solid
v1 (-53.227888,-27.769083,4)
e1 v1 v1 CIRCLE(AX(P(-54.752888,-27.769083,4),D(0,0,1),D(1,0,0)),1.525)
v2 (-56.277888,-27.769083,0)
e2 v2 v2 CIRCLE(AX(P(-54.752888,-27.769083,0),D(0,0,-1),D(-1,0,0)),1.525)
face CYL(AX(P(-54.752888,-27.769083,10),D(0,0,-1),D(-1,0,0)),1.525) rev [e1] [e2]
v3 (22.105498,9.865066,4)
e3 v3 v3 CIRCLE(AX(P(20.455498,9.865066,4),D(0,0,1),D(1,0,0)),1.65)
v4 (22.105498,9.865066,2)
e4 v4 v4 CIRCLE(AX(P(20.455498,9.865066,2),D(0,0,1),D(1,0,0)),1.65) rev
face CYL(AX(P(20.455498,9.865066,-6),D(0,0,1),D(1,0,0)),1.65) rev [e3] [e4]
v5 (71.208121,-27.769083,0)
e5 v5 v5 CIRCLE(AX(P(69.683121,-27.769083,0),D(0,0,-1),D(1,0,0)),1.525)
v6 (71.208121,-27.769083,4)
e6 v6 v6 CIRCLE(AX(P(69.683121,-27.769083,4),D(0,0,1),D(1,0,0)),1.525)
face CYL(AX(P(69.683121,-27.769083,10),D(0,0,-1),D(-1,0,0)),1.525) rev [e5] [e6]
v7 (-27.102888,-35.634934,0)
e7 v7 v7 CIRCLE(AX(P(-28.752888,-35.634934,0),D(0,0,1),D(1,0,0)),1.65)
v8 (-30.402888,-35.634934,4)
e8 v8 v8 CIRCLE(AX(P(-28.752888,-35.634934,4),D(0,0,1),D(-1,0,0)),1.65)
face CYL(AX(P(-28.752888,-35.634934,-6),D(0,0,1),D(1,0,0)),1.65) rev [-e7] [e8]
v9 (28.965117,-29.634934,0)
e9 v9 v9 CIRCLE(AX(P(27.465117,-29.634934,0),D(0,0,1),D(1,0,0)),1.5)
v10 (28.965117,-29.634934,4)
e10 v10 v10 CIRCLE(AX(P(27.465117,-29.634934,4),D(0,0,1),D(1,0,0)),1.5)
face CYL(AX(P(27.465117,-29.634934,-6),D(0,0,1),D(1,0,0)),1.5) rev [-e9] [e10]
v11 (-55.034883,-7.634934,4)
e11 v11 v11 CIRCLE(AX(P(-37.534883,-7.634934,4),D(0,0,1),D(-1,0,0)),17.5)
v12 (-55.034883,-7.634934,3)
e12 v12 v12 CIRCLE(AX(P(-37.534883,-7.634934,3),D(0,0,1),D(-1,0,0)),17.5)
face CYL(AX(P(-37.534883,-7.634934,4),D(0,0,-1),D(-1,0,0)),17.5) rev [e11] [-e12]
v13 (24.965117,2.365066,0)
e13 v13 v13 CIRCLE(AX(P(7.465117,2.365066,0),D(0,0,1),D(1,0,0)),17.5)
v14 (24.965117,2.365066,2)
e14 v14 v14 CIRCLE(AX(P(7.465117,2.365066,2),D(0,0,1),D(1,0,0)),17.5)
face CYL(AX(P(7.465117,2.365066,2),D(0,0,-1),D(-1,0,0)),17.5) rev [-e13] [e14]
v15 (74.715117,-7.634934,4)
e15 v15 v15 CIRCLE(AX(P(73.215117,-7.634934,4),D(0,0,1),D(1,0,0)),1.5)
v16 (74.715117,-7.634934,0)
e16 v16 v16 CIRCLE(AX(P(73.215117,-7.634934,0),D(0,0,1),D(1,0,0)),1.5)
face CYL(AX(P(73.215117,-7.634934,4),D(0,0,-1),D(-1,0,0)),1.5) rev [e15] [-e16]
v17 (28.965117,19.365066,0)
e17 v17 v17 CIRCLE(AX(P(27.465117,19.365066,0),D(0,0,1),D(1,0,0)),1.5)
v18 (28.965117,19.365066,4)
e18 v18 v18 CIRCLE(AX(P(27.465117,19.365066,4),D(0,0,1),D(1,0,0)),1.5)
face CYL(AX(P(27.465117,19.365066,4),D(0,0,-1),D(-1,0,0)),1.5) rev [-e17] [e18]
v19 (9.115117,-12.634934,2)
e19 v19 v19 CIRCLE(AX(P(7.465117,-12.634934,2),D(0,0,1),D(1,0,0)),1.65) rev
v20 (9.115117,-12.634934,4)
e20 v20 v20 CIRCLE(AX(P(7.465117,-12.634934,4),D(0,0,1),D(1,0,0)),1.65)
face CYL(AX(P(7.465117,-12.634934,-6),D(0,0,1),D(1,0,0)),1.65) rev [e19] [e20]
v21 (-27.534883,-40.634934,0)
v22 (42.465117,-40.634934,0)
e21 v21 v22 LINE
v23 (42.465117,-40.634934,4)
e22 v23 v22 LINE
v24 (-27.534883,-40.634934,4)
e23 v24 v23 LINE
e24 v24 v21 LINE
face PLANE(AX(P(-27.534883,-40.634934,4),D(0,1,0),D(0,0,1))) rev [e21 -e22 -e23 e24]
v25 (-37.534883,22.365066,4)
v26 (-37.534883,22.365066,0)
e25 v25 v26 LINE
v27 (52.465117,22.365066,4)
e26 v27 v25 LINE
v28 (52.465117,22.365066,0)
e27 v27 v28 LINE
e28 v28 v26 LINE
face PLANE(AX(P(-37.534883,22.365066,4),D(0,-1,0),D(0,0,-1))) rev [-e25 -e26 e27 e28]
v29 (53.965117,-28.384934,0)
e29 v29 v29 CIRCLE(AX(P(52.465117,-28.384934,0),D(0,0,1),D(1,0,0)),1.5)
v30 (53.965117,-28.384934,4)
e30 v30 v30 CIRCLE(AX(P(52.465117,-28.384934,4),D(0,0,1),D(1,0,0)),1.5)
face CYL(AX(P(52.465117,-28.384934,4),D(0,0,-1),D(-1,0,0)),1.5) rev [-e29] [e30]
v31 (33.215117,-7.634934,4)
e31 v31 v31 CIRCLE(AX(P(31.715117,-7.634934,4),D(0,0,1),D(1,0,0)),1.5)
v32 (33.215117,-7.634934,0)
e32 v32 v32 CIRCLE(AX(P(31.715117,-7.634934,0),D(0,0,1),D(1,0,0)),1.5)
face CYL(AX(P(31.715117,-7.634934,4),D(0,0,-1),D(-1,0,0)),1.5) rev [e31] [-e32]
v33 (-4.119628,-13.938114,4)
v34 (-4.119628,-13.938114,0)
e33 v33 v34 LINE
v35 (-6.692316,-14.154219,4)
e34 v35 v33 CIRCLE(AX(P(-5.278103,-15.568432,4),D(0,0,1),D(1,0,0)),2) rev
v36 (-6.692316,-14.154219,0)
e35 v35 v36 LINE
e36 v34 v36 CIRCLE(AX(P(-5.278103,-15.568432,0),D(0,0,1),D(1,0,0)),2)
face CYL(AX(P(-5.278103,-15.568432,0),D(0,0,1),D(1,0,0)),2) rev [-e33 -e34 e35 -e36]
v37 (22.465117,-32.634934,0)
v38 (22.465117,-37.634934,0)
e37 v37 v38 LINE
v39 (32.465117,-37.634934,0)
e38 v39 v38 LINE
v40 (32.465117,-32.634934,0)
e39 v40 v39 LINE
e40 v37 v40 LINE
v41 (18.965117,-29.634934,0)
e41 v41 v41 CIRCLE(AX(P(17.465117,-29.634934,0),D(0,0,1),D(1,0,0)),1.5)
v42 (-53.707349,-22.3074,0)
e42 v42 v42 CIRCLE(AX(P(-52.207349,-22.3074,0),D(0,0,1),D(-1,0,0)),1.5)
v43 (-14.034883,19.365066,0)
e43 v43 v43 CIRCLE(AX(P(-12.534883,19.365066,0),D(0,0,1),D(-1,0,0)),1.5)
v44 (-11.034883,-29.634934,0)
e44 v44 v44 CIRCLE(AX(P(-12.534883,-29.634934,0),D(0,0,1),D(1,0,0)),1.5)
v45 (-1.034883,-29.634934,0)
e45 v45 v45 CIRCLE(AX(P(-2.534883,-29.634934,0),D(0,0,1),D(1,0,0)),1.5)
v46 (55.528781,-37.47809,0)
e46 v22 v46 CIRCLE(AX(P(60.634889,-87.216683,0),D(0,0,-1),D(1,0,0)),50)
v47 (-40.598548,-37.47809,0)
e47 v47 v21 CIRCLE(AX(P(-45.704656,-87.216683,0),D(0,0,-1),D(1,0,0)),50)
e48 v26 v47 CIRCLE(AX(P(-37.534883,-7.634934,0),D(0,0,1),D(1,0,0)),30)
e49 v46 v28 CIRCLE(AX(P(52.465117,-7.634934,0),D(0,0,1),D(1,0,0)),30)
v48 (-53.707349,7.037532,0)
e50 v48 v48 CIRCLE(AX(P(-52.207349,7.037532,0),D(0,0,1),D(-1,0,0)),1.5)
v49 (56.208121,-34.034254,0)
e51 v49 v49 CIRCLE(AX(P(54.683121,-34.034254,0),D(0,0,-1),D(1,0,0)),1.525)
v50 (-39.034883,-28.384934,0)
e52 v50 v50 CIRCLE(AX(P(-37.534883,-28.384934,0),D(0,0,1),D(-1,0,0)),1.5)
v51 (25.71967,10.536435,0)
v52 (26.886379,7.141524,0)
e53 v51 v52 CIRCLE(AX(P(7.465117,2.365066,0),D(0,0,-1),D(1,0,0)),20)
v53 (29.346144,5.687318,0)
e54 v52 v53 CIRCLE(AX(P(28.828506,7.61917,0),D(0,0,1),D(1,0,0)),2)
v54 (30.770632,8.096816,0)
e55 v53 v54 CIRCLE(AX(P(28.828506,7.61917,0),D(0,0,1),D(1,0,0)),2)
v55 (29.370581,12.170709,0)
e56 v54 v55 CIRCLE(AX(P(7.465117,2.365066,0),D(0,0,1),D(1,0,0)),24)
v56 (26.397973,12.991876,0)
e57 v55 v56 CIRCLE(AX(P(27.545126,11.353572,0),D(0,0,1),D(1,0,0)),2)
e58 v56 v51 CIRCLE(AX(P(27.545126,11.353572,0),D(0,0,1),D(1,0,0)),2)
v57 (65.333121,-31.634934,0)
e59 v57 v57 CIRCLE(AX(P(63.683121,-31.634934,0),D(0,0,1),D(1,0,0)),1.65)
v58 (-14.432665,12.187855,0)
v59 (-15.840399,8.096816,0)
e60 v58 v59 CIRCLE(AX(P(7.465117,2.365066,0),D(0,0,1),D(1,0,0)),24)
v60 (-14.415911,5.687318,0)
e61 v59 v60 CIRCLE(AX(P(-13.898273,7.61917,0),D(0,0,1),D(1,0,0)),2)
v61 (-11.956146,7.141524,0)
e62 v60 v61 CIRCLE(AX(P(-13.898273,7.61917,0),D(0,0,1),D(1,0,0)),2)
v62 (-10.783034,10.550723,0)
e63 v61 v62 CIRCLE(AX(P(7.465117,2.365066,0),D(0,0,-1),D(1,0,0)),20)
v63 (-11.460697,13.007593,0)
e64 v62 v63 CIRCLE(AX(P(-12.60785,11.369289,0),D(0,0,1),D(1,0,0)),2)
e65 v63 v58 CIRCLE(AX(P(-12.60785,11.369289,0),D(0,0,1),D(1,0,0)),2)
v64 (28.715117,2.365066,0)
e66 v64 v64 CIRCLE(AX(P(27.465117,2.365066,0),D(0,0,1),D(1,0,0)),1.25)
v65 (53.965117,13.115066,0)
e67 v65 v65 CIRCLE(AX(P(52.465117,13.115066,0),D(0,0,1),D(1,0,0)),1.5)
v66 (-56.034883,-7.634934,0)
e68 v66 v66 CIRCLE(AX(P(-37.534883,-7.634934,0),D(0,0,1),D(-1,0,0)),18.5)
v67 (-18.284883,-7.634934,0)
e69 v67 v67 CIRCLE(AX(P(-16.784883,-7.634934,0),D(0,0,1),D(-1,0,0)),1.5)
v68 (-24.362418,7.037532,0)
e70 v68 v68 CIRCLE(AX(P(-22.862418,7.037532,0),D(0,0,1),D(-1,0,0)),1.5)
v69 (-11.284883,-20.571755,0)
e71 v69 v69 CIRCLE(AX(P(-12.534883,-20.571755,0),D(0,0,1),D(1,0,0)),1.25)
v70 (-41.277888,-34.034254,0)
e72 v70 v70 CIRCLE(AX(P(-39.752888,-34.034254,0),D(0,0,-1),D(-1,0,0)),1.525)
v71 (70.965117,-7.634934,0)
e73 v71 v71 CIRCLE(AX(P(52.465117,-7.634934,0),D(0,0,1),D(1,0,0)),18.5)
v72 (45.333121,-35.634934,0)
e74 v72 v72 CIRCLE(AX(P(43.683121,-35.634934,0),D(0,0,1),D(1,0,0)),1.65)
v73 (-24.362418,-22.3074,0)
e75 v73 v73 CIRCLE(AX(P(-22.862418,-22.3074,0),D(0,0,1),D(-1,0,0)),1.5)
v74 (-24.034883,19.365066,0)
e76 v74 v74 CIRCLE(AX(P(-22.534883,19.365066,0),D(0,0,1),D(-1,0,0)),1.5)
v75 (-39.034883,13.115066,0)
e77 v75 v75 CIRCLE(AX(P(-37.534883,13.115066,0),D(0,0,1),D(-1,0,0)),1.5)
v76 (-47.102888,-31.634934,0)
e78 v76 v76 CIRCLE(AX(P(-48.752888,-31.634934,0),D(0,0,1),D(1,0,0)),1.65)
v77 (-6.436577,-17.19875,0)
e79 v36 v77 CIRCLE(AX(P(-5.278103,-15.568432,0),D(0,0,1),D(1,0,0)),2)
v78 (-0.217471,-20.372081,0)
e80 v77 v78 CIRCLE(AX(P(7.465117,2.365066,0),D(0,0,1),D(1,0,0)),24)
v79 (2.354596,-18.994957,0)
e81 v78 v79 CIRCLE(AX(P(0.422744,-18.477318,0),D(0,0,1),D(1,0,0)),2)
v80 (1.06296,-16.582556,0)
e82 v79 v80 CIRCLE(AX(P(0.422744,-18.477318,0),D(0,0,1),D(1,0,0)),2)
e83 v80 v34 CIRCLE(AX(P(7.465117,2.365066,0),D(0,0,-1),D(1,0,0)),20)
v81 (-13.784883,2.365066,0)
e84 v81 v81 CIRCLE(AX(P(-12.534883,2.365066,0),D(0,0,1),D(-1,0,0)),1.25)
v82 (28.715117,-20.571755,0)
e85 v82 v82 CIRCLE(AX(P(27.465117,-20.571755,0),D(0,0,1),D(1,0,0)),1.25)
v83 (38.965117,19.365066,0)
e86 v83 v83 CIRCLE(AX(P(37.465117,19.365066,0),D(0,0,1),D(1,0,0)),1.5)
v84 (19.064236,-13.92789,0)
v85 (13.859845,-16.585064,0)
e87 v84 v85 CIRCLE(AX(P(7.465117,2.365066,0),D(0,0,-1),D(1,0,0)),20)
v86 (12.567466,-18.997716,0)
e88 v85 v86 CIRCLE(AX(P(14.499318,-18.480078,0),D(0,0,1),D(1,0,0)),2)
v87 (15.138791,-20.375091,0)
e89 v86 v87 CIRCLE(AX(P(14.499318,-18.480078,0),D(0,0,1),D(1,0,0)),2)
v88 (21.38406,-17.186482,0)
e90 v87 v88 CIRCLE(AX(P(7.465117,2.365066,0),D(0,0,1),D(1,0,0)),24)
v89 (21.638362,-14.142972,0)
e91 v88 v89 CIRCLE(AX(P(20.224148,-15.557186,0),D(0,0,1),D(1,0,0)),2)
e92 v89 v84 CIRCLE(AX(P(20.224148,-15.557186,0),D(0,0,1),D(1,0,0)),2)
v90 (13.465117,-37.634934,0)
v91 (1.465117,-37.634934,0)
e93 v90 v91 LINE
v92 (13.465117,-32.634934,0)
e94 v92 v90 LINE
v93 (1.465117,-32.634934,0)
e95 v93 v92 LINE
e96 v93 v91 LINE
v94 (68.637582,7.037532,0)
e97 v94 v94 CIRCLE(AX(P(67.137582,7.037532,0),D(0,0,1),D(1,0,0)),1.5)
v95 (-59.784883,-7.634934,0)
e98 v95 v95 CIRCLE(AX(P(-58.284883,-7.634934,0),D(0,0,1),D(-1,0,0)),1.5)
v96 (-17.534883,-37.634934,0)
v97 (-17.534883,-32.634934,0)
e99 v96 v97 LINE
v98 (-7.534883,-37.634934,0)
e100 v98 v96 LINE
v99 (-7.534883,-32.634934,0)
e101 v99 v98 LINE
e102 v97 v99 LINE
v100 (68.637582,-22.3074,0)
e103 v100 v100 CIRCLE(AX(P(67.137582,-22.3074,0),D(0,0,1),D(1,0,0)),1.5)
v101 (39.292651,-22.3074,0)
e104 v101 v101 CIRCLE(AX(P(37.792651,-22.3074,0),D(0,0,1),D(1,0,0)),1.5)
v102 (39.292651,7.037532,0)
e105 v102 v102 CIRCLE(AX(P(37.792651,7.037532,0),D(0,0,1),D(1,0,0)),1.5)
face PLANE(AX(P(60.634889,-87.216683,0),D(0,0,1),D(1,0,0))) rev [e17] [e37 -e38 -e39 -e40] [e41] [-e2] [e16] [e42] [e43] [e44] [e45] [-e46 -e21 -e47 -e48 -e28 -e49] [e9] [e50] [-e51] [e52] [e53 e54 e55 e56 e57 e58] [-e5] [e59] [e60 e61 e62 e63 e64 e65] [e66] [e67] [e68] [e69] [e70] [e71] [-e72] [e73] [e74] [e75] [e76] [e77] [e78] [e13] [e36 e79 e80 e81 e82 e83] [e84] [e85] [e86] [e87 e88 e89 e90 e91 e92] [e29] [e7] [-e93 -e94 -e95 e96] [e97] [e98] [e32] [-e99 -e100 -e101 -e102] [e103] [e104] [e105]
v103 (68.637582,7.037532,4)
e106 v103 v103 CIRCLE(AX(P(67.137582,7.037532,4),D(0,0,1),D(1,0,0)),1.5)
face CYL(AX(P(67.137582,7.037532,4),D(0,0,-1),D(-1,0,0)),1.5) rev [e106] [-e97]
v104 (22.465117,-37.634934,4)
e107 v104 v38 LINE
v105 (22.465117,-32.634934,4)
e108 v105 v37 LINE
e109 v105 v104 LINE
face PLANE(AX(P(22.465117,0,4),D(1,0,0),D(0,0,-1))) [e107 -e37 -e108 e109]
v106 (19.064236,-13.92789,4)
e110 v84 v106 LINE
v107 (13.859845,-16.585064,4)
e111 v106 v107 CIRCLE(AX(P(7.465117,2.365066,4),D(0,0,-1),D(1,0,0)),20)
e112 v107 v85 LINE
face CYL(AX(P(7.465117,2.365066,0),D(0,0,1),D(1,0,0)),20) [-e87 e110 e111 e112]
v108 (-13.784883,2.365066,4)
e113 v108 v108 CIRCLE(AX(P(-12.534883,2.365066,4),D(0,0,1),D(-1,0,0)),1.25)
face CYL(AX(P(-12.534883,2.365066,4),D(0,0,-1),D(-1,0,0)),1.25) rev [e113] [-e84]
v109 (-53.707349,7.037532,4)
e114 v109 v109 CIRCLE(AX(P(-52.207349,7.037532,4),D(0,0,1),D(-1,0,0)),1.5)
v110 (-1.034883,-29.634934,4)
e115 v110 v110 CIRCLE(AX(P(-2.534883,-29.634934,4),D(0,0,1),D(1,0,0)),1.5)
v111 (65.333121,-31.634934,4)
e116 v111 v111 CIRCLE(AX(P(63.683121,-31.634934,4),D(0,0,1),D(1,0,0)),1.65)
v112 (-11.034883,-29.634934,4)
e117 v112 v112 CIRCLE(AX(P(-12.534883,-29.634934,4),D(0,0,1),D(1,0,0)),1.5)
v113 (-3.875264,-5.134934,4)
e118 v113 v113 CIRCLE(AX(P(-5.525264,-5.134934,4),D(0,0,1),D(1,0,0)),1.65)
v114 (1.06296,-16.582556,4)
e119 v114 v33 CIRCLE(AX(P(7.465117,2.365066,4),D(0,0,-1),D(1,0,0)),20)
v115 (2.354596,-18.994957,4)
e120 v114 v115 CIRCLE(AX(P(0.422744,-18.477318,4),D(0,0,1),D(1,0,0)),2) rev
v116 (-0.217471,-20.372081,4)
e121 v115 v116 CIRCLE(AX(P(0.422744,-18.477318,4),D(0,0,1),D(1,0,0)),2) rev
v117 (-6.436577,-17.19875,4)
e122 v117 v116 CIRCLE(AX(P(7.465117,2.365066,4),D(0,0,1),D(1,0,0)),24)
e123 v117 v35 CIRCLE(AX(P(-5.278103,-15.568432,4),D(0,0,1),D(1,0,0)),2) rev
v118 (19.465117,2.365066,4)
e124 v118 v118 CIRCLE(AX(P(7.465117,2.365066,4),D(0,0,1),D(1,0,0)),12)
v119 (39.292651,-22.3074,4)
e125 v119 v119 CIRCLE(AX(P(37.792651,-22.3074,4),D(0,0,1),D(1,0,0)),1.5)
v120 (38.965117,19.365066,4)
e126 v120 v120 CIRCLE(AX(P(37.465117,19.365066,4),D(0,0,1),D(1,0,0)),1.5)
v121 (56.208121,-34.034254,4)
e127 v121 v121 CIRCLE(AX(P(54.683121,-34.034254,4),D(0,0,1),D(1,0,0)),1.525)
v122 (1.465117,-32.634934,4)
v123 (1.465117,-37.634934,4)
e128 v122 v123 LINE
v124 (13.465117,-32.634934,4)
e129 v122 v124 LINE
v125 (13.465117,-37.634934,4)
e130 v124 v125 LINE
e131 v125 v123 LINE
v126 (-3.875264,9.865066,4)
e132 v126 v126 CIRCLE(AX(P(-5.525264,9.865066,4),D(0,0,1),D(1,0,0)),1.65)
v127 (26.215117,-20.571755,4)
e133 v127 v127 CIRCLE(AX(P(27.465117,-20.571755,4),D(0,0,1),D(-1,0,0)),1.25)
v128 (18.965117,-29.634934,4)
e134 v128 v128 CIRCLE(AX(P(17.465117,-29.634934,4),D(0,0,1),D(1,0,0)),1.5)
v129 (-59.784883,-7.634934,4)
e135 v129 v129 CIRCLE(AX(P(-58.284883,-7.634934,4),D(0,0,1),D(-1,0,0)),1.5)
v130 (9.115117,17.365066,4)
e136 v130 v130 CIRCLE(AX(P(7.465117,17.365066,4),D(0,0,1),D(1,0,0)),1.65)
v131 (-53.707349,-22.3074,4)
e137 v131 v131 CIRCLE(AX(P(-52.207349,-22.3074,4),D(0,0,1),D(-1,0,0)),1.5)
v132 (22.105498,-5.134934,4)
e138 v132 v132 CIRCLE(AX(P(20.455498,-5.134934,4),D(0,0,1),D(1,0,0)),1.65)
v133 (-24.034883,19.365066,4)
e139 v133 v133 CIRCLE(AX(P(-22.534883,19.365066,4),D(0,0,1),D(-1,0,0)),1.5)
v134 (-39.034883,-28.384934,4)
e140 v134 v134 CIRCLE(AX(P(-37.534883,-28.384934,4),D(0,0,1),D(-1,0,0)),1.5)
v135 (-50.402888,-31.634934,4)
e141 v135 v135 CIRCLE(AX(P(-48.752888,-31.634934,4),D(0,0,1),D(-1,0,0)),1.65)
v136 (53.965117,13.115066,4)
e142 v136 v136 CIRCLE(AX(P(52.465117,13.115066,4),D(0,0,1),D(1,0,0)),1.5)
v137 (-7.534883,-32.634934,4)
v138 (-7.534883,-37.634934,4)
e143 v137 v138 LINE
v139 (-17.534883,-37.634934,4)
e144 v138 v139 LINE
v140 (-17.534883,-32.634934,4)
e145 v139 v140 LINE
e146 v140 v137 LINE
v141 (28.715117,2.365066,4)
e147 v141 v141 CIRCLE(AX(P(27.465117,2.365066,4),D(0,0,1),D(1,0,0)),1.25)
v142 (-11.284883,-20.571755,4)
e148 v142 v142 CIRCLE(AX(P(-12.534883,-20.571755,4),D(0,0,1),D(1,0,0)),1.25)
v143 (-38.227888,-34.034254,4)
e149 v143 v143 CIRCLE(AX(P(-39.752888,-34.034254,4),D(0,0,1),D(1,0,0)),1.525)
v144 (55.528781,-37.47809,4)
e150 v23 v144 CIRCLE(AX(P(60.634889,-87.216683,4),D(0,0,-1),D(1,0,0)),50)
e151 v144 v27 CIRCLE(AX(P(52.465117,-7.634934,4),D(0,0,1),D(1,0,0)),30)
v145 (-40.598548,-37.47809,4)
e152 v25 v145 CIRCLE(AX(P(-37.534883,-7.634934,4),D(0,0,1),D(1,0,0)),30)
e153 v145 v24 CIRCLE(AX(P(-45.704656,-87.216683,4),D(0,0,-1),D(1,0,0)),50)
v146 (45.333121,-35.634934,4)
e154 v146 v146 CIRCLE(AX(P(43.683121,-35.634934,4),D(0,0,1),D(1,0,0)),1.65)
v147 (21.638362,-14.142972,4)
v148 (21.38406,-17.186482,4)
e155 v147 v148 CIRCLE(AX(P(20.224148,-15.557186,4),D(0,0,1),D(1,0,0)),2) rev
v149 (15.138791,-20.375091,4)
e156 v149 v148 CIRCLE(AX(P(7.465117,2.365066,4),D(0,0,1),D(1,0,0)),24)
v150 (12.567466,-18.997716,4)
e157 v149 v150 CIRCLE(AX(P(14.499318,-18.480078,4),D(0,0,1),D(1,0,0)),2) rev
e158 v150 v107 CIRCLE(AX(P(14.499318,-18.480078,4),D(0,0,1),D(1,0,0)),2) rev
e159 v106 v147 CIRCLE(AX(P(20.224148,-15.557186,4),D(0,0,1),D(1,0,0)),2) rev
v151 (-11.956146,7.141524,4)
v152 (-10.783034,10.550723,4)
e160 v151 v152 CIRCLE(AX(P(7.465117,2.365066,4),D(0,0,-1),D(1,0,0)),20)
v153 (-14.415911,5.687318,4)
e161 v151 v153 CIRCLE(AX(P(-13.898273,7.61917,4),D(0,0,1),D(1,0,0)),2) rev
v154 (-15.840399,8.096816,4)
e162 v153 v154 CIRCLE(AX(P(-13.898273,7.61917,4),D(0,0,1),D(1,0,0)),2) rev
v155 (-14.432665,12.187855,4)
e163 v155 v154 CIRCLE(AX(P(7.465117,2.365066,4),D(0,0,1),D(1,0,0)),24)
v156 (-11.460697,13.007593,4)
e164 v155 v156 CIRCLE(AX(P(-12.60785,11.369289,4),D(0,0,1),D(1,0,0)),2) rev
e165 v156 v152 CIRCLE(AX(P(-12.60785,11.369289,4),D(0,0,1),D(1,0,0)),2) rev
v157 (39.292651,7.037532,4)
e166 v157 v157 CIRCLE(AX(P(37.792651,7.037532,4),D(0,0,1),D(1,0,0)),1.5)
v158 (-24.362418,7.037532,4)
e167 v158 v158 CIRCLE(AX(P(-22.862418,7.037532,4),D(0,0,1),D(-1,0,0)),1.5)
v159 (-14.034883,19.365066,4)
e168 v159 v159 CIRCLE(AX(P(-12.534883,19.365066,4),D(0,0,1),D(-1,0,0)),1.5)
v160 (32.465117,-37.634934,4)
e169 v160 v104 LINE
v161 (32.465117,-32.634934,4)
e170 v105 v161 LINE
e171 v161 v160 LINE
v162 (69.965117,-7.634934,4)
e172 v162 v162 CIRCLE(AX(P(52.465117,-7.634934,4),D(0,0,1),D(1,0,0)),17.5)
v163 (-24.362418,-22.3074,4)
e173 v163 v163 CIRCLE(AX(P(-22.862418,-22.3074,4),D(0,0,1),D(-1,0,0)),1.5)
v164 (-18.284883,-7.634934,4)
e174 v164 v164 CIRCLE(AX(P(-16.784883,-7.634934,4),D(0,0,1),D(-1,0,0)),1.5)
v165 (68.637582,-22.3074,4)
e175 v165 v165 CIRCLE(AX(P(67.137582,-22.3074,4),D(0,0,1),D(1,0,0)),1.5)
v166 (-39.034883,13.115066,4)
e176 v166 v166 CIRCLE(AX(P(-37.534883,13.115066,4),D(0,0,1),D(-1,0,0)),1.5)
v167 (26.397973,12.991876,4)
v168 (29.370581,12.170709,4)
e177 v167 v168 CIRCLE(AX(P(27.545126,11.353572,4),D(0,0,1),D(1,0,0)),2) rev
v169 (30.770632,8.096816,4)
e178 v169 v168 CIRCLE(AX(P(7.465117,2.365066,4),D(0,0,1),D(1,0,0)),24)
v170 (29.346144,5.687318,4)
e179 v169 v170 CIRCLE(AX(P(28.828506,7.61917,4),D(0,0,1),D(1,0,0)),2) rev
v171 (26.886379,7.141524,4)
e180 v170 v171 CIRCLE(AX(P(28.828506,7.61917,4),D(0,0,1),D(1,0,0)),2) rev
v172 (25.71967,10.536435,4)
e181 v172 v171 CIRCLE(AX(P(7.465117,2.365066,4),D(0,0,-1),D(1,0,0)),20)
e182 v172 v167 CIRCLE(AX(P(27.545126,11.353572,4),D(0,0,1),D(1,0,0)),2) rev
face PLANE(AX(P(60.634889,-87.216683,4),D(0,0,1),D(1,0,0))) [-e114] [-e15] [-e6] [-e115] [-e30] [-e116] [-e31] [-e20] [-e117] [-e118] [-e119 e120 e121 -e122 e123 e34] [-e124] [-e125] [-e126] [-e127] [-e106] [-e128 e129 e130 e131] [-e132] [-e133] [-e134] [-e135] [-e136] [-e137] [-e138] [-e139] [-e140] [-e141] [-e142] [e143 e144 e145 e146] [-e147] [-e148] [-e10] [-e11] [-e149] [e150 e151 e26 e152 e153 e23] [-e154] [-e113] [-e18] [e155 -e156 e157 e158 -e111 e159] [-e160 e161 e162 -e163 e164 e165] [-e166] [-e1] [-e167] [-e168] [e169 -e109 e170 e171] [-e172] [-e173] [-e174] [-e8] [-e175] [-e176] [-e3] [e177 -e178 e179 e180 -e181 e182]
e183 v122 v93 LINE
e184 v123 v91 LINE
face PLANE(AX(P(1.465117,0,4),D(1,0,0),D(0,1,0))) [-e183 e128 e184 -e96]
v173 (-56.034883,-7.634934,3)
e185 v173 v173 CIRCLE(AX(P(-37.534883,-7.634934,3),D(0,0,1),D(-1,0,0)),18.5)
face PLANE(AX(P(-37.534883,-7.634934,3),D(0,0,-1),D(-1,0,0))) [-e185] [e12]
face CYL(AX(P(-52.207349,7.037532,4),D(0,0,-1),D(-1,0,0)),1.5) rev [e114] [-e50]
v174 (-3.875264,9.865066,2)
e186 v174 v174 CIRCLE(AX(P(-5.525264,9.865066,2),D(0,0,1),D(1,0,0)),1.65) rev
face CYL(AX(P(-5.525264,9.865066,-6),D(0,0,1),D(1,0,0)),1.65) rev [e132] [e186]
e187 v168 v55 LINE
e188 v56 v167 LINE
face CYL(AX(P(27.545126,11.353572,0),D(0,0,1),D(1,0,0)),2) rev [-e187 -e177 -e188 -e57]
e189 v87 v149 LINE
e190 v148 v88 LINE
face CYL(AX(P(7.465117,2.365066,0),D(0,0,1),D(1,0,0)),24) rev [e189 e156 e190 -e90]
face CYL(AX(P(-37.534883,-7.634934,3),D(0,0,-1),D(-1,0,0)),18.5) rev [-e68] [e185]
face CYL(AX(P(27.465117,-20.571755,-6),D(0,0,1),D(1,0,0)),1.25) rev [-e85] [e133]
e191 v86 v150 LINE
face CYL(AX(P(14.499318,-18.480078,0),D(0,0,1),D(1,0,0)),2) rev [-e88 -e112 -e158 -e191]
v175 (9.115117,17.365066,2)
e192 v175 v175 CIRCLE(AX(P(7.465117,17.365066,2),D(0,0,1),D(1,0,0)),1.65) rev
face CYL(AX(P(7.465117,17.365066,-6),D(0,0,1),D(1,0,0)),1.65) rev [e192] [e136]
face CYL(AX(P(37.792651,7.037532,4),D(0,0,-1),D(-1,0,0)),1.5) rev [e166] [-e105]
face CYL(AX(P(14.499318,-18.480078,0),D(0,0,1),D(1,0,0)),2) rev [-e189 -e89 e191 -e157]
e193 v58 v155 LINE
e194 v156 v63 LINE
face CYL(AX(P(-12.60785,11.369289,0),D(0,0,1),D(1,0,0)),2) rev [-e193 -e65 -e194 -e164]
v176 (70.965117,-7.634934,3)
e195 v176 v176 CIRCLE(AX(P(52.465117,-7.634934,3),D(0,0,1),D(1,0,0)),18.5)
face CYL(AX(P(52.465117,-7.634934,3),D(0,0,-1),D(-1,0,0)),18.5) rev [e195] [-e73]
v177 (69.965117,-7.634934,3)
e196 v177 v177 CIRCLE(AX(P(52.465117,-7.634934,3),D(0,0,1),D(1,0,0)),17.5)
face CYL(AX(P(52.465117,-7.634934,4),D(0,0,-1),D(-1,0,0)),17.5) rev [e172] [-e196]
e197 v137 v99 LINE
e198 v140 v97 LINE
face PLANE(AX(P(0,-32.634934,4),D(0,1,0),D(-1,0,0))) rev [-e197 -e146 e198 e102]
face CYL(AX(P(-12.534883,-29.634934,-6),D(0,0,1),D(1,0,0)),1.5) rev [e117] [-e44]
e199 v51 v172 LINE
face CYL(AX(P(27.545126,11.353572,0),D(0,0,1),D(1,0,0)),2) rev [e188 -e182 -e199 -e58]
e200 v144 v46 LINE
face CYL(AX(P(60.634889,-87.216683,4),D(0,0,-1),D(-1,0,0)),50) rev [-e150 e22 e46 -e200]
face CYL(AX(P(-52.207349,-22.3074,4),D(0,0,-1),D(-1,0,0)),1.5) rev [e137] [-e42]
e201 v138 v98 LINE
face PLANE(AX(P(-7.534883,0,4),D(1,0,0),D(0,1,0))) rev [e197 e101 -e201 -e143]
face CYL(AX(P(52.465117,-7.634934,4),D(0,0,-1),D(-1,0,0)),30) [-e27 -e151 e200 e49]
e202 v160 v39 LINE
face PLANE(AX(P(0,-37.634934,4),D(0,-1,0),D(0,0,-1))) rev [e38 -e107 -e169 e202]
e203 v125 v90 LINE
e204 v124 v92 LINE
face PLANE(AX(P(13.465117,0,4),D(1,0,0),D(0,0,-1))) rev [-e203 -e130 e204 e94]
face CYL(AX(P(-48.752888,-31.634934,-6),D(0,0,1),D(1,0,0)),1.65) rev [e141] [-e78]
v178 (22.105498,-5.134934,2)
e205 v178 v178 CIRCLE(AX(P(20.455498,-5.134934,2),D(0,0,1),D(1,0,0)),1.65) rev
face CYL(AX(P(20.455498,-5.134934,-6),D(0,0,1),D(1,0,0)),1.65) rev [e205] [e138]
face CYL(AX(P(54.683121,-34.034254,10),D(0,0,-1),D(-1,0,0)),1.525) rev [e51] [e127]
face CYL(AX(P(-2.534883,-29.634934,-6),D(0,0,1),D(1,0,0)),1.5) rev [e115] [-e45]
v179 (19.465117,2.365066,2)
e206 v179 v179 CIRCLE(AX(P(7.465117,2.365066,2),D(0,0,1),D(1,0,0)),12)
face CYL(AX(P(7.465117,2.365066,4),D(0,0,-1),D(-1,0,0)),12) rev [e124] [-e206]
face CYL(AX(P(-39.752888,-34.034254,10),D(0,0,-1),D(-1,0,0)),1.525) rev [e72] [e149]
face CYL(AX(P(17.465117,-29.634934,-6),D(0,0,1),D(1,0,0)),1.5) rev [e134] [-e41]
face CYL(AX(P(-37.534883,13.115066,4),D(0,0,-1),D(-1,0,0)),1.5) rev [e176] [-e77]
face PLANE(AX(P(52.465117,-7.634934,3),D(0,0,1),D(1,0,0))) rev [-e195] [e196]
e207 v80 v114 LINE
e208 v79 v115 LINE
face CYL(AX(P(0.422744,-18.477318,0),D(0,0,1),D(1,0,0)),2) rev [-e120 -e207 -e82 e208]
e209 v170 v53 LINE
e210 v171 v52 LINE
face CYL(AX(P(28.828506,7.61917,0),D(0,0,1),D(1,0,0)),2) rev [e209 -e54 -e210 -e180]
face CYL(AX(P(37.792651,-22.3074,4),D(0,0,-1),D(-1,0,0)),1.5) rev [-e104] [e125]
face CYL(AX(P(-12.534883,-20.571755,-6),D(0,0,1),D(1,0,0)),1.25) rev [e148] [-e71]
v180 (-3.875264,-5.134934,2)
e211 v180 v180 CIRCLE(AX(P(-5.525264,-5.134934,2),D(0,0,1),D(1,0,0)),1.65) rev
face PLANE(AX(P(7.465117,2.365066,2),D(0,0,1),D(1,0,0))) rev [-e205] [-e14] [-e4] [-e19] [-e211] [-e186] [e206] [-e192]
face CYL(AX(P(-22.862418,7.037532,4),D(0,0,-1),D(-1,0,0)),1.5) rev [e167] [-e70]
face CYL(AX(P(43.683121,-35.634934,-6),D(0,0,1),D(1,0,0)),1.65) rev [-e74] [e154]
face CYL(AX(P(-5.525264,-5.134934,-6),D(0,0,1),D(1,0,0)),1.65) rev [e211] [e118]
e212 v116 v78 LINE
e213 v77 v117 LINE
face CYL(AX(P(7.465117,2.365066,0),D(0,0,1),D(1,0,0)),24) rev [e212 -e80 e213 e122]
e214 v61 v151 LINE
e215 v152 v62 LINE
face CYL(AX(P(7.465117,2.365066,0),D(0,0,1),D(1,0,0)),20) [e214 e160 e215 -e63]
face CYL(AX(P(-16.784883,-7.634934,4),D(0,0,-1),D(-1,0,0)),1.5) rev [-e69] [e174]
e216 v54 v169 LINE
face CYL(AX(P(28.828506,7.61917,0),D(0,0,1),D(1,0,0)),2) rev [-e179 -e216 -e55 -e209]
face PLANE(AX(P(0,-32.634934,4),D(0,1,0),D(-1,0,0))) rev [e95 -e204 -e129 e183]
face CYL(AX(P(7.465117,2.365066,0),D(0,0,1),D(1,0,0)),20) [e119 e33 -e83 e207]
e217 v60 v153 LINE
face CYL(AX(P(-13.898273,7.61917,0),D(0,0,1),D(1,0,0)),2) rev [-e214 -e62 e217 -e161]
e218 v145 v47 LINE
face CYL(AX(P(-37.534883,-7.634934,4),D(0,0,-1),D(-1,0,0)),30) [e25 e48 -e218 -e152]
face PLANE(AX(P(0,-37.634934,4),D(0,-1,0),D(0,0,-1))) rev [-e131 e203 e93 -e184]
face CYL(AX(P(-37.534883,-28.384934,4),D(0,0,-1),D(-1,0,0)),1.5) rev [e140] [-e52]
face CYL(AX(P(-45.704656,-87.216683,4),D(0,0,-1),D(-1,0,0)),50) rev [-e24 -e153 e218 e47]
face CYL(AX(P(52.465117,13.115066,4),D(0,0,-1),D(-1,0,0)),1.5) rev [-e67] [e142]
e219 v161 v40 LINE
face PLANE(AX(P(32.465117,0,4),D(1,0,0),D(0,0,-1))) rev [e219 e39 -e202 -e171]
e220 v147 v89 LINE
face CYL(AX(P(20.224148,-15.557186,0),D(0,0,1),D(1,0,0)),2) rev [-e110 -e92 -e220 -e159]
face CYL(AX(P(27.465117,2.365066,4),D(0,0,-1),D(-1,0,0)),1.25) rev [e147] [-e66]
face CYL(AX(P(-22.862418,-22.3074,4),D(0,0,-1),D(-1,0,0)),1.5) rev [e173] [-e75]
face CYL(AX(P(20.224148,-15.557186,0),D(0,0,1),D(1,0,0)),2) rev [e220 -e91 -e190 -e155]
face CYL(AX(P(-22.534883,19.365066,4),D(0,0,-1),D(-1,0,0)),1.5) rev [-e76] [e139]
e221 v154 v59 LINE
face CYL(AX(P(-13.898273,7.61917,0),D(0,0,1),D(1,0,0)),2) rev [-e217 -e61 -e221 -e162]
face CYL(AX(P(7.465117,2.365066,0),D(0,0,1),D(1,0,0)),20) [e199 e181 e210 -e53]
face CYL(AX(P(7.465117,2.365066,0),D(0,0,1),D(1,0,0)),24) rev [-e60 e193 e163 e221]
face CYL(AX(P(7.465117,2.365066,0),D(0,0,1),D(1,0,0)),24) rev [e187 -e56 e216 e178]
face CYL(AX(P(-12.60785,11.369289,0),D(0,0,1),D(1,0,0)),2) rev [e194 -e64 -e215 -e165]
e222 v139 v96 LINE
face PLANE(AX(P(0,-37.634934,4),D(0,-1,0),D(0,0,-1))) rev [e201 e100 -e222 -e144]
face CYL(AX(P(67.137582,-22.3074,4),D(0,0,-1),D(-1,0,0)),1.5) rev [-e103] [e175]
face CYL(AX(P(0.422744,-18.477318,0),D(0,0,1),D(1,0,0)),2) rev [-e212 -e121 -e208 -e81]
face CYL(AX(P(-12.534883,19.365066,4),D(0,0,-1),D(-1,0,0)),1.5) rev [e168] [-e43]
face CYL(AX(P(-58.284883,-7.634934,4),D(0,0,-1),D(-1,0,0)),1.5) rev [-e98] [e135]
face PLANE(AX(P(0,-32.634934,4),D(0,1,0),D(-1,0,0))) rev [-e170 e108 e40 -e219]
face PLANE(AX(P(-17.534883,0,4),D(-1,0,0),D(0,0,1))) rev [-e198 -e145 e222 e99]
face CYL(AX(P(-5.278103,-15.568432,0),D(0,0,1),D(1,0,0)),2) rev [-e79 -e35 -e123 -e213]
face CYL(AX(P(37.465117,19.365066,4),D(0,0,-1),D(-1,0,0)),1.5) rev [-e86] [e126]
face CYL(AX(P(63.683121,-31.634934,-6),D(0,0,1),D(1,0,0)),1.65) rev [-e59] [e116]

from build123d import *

# Parameters (mm, degrees)
SKETCH_1_R           = 1.5
SKETCH_1_R_2         = 17.5
SKETCH_1_R_3         = 12
SKETCH_1_R_4         = 1.25
EXTRUDE_1_DEPTH      = 4
SKETCH_2_R           = 18.5
SKETCH_2_R_2         = 17.5
CUT_EXTRUDE_1_DEPTH  = 3
SKETCH_3_W           = 10
SKETCH_3_H           = 5
SKETCH_3_W_2         = 6
CUT_EXTRUDE_2_DEPTH  = 93.020070098
CUT_EXTRUDE_3_DEPTH  = 93.020070098
FILLET_2_R           = 2
SKETCH_6_R           = 1.25
CUT_EXTRUDE_5_DEPTH  = 10
SKETCH_7_R           = 1.65
CUT_EXTRUDE_6_DEPTH  = 10
SKETCH_9_R           = 1.65
CUT_EXTRUDE_7_DEPTH  = 10
SKETCH_10_R          = 17.5
SKETCH_10_R_2        = 10.270750689
CUT_EXTRUDE_8_DEPTH  = 2
SKETCH_11_R          = 1.5
CUT_EXTRUDE_9_DEPTH  = 10
SKETCH_12_R          = 1.525
CUT_EXTRUDE_10_DEPTH = 10


with BuildPart() as part:
    # 草图1 → 凸台-拉伸1 (new body)
    with BuildSketch(Plane.XY):
        with BuildLine():
            Line((-27.534883443, -40.634933888), (42.465116557, -40.634933888))
            ThreePointArc((42.465116557, -40.634933888), (48.890398145, -38.615583047), (55.528781273, -37.478089862))
            ThreePointArc((55.528781273, -37.478089862), (82.425879892, -6.10109544), (52.465116557, 22.365066112))
            Line((52.465116557, 22.365066112), (-37.534883443, 22.365066112))
            ThreePointArc((-37.534883443, 22.365066112), (-67.495646778, -6.10109544), (-40.598548158, -37.478089862))
            ThreePointArc((-40.598548158, -37.478089862), (-33.960165031, -38.615583047), (-27.534883443, -40.634933888))
        make_face()
        with Locations((52.465116557, 13.115066112)):
            Circle(SKETCH_1_R, mode=Mode.SUBTRACT)
        with Locations((67.137582267, 7.037531822)):
            Circle(SKETCH_1_R, mode=Mode.SUBTRACT)
        with Locations((73.215116557, -7.634933888)):
            Circle(SKETCH_1_R, mode=Mode.SUBTRACT)
        with Locations((67.137582267, -22.307399597)):
            Circle(SKETCH_1_R, mode=Mode.SUBTRACT)
        with Locations((52.465116557, -28.384933888)):
            Circle(SKETCH_1_R, mode=Mode.SUBTRACT)
        with Locations((37.792650848, -22.307399597)):
            Circle(SKETCH_1_R, mode=Mode.SUBTRACT)
        with Locations((31.715116557, -7.634933888)):
            Circle(SKETCH_1_R, mode=Mode.SUBTRACT)
        with Locations((37.792650848, 7.037531822)):
            Circle(SKETCH_1_R, mode=Mode.SUBTRACT)
        with Locations(Location((-22.862417733, 7.037531822, 0), (0, 0, 180))):
            Circle(SKETCH_1_R, mode=Mode.SUBTRACT)
        with Locations(Location((-16.784883443, -7.634933888, 0), (0, 0, 180))):
            Circle(SKETCH_1_R, mode=Mode.SUBTRACT)
        with Locations(Location((-22.862417733, -22.307399597, 0), (0, 0, 180))):
            Circle(SKETCH_1_R, mode=Mode.SUBTRACT)
        with Locations(Location((-37.534883443, -28.384933888, 0), (0, 0, 180))):
            Circle(SKETCH_1_R, mode=Mode.SUBTRACT)
        with Locations(Location((-52.207349152, -22.307399597, 0), (0, 0, 180))):
            Circle(SKETCH_1_R, mode=Mode.SUBTRACT)
        with Locations(Location((-58.284883443, -7.634933888, 0), (0, 0, 180))):
            Circle(SKETCH_1_R, mode=Mode.SUBTRACT)
        with Locations(Location((-52.207349152, 7.037531822, 0), (0, 0, 180))):
            Circle(SKETCH_1_R, mode=Mode.SUBTRACT)
        with Locations(Location((-37.534883443, 13.115066112, 0), (0, 0, 180))):
            Circle(SKETCH_1_R, mode=Mode.SUBTRACT)
        with Locations((52.465116557, -7.634933888)):
            Circle(SKETCH_1_R_2, mode=Mode.SUBTRACT)
        with Locations(Location((-37.534883443, -7.634933888, 0), (0, 0, 180))):
            Circle(SKETCH_1_R_2, mode=Mode.SUBTRACT)
        with Locations((7.465116557, 2.365066112)):
            Circle(SKETCH_1_R_3, mode=Mode.SUBTRACT)
        with Locations((37.465116557, 19.365066112)):
            Circle(SKETCH_1_R, mode=Mode.SUBTRACT)
        with Locations((27.465116557, 19.365066112)):
            Circle(SKETCH_1_R, mode=Mode.SUBTRACT)
        with Locations(Location((-22.534883443, 19.365066112, 0), (0, 0, 180))):
            Circle(SKETCH_1_R, mode=Mode.SUBTRACT)
        with Locations(Location((-12.534883443, 19.365066112, 0), (0, 0, 180))):
            Circle(SKETCH_1_R, mode=Mode.SUBTRACT)
        with Locations((27.465116557, 2.365066112)):
            Circle(SKETCH_1_R_4, mode=Mode.SUBTRACT)
        with Locations(Location((-12.534883443, 2.365066112, 0), (0, 0, 180))):
            Circle(SKETCH_1_R_4, mode=Mode.SUBTRACT)
    extrude(amount=EXTRUDE_1_DEPTH)

    # 草图2 → 切除-拉伸1 (cut)
    # profile 1 of 2: a face of its own
    with BuildSketch(Plane.XY):
        with Locations((52.465116557, -7.634933888)):
            Circle(SKETCH_2_R)
        with Locations((52.465116557, -7.634933888)):
            Circle(SKETCH_2_R_2, mode=Mode.SUBTRACT)
    # profile 2 of 2: a face of its own
    with BuildSketch(Plane.XY):
        with Locations(Location((-37.534883443, -7.634933888, 0), (0, 0, 180))):
            Circle(SKETCH_2_R)
        with Locations(Location((-37.534883443, -7.634933888, 0), (0, 0, 180))):
            Circle(SKETCH_2_R_2, mode=Mode.SUBTRACT)
    extrude(amount=CUT_EXTRUDE_1_DEPTH, mode=Mode.SUBTRACT)

    # 草图3 → 切除-拉伸2 (cut, through all)
    with BuildSketch(Plane(origin=(0, 0, 0), x_dir=(-1, 0, 0), z_dir=(0, 0, -1))):
        with Locations((-27.465116557, -35.134933888)):
            Rectangle(SKETCH_3_W, SKETCH_3_H)
        with Locations((-10.465116557, -35.134933888)):
            Rectangle(SKETCH_3_W_2, SKETCH_3_H)
        with Locations((-4.465116557, -35.134933888)):
            Rectangle(SKETCH_3_W_2, SKETCH_3_H)
        with Locations((12.534883443, -35.134933888)):
            Rectangle(SKETCH_3_W, SKETCH_3_H)
    extrude(amount=-CUT_EXTRUDE_2_DEPTH, mode=Mode.SUBTRACT)

    # 草图4 → 切除-拉伸3 (cut, through all)
    with BuildSketch(Plane.XY.offset(4)):
        with BuildLine():
            Line((-5.446700673, -12.908603251), (-8.283381868, -15.745284446))
            ThreePointArc((-8.283381868, -15.745284446), (-3.541787321, -18.962101234), (1.82717455, -20.963320243))
            Line((1.82717455, -20.963320243), (2.862828881, -17.098205662))
            ThreePointArc((2.862828881, -17.098205662), (-1.539002487, -15.493428792), (-5.446700673, -12.908603251))
        make_face()
        with BuildLine():
            Line((20.391590305, -12.896201085), (23.228082643, -15.732693423))
            ThreePointArc((23.228082643, -15.732693423), (18.476716566, -18.959676916), (13.094689736, -20.96534121))
            Line((13.094689736, -20.96534121), (12.059024323, -17.100185272))
            ThreePointArc((12.059024323, -17.100185272), (16.473962924, -15.491044526), (20.391590305, -12.896201085))
        make_face()
        with BuildLine():
            Line((24.9885745, 12.005004999), (28.281142659, 14.310486044))
            ThreePointArc((28.281142659, 14.310486044), (30.089876696, 10.372576877), (31.161002411, 6.173608298))
            Line((31.161002411, 6.173608298), (27.272825293, 5.131774379))
            ThreePointArc((27.272825293, 5.131774379), (26.444429669, 8.672654702), (24.9885745, 12.005004999))
        make_face()
        with BuildLine():
            Line((-10.050135089, 12.019907372), (-13.342451817, 14.325212363))
            ThreePointArc((-13.342451817, 14.325212363), (-15.15680913, 10.380580957), (-16.230769297, 6.173608298))
            Line((-16.230769297, 6.173608298), (-12.342592179, 5.131774379))
            ThreePointArc((-12.342592179, 5.131774379), (-11.511512147, 8.680726255), (-10.050135089, 12.019907372))
        make_face()
    extrude(amount=-CUT_EXTRUDE_3_DEPTH, mode=Mode.SUBTRACT)

    # 圆角2
    fillet_2_edges = [part.edges().sort_by_distance(p)[0] for p in [
        (-10.050135089, 12.019907372, 2),
        (-12.342592179, 5.131774379, 2),
        (-16.230769297, 6.173608298, 2),
        (-13.342451817, 14.325212363, 2),
        (-5.446700673, -12.908603251, 2),
        (-8.283381868, -15.745284446, 2),
        (24.9885745, 12.005004999, 2),
        (27.272825293, 5.131774379, 2),
        (31.161002411, 6.173608298, 2),
        (28.281142659, 14.310486044, 2),
        (23.228082643, -15.732693423, 2),
        (20.391590305, -12.896201085, 2),
        (13.094689736, -20.96534121, 2),
        (12.059024323, -17.100185272, 2),
        (2.862828881, -17.098205662, 2),
        (1.82717455, -20.963320243, 2),
    ]]
    fillet(fillet_2_edges, radius=FILLET_2_R - 0.0001)  # a hair under: the kernel refuses the full size

    # 草图6 → 切除-拉伸5 (cut)
    with BuildSketch(Plane.XY.offset(4)):
        with Locations((-12.534883443, -20.571755315)):
            Circle(SKETCH_6_R)
        with Locations((27.465116557, -20.571755315)):
            Circle(SKETCH_6_R)
    extrude(amount=-CUT_EXTRUDE_5_DEPTH, mode=Mode.SUBTRACT)

    # 草图7 → 切除-拉伸6 (cut)
    with BuildSketch(Plane.XY.offset(4)):
        with Locations((43.683121449, -35.634933888)):
            Circle(SKETCH_7_R)
        with Locations((63.683121449, -31.634933888)):
            Circle(SKETCH_7_R)
        with Locations((-48.752888335, -31.634933888)):
            Circle(SKETCH_7_R)
        with Locations((-28.752888335, -35.634933888)):
            Circle(SKETCH_7_R)
    extrude(amount=-CUT_EXTRUDE_6_DEPTH, mode=Mode.SUBTRACT)

    # 草图9 → 切除-拉伸7 (cut)
    with BuildSketch(Plane.XY.offset(4)):
        with Locations((7.465116557, 17.365066112)):
            Circle(SKETCH_9_R)
        with Locations((20.455497614, 9.865066112)):
            Circle(SKETCH_9_R)
        with Locations((20.455497614, -5.134933888)):
            Circle(SKETCH_9_R)
        with Locations((7.465116557, -12.634933888)):
            Circle(SKETCH_9_R)
        with Locations((-5.5252645, -5.134933888)):
            Circle(SKETCH_9_R)
        with Locations((-5.5252645, 9.865066112)):
            Circle(SKETCH_9_R)
    extrude(amount=-CUT_EXTRUDE_7_DEPTH, mode=Mode.SUBTRACT)

    # 草图10 → 切除-拉伸8 (cut)
    with BuildSketch(Plane.XY):
        with Locations((7.465116557, 2.365066112)):
            Circle(SKETCH_10_R)
        with Locations((7.465116557, 2.365066112)):
            Circle(SKETCH_10_R_2, mode=Mode.SUBTRACT)
    extrude(amount=CUT_EXTRUDE_8_DEPTH, mode=Mode.SUBTRACT)

    # 草图11 → 切除-拉伸9 (cut)
    with BuildSketch(Plane.XY.offset(4)):
        with Locations((17.465116557, -29.634933888)):
            Circle(SKETCH_11_R)
        with Locations((27.465116557, -29.634933888)):
            Circle(SKETCH_11_R)
        with Locations((-12.534883443, -29.634933888)):
            Circle(SKETCH_11_R)
        with Locations((-2.534883443, -29.634933888)):
            Circle(SKETCH_11_R)
    extrude(amount=-CUT_EXTRUDE_9_DEPTH, mode=Mode.SUBTRACT)

    # 草图12 → 切除-拉伸10 (cut)
    with BuildSketch(Plane(origin=(0, 0, 0), x_dir=(-1, 0, 0), z_dir=(0, 0, -1))):
        with Locations((39.752888335, -34.034253729)):
            Circle(SKETCH_12_R)
        with Locations((54.752888335, -27.769082524)):
            Circle(SKETCH_12_R)
        with Locations(Location((-69.683121449, -27.769082524, 0), (0, 0, 180))):
            Circle(SKETCH_12_R)
        with Locations(Location((-54.683121449, -34.034253729, 0), (0, 0, 180))):
            Circle(SKETCH_12_R)
    extrude(amount=-CUT_EXTRUDE_10_DEPTH, mode=Mode.SUBTRACT)


solid = part.part
